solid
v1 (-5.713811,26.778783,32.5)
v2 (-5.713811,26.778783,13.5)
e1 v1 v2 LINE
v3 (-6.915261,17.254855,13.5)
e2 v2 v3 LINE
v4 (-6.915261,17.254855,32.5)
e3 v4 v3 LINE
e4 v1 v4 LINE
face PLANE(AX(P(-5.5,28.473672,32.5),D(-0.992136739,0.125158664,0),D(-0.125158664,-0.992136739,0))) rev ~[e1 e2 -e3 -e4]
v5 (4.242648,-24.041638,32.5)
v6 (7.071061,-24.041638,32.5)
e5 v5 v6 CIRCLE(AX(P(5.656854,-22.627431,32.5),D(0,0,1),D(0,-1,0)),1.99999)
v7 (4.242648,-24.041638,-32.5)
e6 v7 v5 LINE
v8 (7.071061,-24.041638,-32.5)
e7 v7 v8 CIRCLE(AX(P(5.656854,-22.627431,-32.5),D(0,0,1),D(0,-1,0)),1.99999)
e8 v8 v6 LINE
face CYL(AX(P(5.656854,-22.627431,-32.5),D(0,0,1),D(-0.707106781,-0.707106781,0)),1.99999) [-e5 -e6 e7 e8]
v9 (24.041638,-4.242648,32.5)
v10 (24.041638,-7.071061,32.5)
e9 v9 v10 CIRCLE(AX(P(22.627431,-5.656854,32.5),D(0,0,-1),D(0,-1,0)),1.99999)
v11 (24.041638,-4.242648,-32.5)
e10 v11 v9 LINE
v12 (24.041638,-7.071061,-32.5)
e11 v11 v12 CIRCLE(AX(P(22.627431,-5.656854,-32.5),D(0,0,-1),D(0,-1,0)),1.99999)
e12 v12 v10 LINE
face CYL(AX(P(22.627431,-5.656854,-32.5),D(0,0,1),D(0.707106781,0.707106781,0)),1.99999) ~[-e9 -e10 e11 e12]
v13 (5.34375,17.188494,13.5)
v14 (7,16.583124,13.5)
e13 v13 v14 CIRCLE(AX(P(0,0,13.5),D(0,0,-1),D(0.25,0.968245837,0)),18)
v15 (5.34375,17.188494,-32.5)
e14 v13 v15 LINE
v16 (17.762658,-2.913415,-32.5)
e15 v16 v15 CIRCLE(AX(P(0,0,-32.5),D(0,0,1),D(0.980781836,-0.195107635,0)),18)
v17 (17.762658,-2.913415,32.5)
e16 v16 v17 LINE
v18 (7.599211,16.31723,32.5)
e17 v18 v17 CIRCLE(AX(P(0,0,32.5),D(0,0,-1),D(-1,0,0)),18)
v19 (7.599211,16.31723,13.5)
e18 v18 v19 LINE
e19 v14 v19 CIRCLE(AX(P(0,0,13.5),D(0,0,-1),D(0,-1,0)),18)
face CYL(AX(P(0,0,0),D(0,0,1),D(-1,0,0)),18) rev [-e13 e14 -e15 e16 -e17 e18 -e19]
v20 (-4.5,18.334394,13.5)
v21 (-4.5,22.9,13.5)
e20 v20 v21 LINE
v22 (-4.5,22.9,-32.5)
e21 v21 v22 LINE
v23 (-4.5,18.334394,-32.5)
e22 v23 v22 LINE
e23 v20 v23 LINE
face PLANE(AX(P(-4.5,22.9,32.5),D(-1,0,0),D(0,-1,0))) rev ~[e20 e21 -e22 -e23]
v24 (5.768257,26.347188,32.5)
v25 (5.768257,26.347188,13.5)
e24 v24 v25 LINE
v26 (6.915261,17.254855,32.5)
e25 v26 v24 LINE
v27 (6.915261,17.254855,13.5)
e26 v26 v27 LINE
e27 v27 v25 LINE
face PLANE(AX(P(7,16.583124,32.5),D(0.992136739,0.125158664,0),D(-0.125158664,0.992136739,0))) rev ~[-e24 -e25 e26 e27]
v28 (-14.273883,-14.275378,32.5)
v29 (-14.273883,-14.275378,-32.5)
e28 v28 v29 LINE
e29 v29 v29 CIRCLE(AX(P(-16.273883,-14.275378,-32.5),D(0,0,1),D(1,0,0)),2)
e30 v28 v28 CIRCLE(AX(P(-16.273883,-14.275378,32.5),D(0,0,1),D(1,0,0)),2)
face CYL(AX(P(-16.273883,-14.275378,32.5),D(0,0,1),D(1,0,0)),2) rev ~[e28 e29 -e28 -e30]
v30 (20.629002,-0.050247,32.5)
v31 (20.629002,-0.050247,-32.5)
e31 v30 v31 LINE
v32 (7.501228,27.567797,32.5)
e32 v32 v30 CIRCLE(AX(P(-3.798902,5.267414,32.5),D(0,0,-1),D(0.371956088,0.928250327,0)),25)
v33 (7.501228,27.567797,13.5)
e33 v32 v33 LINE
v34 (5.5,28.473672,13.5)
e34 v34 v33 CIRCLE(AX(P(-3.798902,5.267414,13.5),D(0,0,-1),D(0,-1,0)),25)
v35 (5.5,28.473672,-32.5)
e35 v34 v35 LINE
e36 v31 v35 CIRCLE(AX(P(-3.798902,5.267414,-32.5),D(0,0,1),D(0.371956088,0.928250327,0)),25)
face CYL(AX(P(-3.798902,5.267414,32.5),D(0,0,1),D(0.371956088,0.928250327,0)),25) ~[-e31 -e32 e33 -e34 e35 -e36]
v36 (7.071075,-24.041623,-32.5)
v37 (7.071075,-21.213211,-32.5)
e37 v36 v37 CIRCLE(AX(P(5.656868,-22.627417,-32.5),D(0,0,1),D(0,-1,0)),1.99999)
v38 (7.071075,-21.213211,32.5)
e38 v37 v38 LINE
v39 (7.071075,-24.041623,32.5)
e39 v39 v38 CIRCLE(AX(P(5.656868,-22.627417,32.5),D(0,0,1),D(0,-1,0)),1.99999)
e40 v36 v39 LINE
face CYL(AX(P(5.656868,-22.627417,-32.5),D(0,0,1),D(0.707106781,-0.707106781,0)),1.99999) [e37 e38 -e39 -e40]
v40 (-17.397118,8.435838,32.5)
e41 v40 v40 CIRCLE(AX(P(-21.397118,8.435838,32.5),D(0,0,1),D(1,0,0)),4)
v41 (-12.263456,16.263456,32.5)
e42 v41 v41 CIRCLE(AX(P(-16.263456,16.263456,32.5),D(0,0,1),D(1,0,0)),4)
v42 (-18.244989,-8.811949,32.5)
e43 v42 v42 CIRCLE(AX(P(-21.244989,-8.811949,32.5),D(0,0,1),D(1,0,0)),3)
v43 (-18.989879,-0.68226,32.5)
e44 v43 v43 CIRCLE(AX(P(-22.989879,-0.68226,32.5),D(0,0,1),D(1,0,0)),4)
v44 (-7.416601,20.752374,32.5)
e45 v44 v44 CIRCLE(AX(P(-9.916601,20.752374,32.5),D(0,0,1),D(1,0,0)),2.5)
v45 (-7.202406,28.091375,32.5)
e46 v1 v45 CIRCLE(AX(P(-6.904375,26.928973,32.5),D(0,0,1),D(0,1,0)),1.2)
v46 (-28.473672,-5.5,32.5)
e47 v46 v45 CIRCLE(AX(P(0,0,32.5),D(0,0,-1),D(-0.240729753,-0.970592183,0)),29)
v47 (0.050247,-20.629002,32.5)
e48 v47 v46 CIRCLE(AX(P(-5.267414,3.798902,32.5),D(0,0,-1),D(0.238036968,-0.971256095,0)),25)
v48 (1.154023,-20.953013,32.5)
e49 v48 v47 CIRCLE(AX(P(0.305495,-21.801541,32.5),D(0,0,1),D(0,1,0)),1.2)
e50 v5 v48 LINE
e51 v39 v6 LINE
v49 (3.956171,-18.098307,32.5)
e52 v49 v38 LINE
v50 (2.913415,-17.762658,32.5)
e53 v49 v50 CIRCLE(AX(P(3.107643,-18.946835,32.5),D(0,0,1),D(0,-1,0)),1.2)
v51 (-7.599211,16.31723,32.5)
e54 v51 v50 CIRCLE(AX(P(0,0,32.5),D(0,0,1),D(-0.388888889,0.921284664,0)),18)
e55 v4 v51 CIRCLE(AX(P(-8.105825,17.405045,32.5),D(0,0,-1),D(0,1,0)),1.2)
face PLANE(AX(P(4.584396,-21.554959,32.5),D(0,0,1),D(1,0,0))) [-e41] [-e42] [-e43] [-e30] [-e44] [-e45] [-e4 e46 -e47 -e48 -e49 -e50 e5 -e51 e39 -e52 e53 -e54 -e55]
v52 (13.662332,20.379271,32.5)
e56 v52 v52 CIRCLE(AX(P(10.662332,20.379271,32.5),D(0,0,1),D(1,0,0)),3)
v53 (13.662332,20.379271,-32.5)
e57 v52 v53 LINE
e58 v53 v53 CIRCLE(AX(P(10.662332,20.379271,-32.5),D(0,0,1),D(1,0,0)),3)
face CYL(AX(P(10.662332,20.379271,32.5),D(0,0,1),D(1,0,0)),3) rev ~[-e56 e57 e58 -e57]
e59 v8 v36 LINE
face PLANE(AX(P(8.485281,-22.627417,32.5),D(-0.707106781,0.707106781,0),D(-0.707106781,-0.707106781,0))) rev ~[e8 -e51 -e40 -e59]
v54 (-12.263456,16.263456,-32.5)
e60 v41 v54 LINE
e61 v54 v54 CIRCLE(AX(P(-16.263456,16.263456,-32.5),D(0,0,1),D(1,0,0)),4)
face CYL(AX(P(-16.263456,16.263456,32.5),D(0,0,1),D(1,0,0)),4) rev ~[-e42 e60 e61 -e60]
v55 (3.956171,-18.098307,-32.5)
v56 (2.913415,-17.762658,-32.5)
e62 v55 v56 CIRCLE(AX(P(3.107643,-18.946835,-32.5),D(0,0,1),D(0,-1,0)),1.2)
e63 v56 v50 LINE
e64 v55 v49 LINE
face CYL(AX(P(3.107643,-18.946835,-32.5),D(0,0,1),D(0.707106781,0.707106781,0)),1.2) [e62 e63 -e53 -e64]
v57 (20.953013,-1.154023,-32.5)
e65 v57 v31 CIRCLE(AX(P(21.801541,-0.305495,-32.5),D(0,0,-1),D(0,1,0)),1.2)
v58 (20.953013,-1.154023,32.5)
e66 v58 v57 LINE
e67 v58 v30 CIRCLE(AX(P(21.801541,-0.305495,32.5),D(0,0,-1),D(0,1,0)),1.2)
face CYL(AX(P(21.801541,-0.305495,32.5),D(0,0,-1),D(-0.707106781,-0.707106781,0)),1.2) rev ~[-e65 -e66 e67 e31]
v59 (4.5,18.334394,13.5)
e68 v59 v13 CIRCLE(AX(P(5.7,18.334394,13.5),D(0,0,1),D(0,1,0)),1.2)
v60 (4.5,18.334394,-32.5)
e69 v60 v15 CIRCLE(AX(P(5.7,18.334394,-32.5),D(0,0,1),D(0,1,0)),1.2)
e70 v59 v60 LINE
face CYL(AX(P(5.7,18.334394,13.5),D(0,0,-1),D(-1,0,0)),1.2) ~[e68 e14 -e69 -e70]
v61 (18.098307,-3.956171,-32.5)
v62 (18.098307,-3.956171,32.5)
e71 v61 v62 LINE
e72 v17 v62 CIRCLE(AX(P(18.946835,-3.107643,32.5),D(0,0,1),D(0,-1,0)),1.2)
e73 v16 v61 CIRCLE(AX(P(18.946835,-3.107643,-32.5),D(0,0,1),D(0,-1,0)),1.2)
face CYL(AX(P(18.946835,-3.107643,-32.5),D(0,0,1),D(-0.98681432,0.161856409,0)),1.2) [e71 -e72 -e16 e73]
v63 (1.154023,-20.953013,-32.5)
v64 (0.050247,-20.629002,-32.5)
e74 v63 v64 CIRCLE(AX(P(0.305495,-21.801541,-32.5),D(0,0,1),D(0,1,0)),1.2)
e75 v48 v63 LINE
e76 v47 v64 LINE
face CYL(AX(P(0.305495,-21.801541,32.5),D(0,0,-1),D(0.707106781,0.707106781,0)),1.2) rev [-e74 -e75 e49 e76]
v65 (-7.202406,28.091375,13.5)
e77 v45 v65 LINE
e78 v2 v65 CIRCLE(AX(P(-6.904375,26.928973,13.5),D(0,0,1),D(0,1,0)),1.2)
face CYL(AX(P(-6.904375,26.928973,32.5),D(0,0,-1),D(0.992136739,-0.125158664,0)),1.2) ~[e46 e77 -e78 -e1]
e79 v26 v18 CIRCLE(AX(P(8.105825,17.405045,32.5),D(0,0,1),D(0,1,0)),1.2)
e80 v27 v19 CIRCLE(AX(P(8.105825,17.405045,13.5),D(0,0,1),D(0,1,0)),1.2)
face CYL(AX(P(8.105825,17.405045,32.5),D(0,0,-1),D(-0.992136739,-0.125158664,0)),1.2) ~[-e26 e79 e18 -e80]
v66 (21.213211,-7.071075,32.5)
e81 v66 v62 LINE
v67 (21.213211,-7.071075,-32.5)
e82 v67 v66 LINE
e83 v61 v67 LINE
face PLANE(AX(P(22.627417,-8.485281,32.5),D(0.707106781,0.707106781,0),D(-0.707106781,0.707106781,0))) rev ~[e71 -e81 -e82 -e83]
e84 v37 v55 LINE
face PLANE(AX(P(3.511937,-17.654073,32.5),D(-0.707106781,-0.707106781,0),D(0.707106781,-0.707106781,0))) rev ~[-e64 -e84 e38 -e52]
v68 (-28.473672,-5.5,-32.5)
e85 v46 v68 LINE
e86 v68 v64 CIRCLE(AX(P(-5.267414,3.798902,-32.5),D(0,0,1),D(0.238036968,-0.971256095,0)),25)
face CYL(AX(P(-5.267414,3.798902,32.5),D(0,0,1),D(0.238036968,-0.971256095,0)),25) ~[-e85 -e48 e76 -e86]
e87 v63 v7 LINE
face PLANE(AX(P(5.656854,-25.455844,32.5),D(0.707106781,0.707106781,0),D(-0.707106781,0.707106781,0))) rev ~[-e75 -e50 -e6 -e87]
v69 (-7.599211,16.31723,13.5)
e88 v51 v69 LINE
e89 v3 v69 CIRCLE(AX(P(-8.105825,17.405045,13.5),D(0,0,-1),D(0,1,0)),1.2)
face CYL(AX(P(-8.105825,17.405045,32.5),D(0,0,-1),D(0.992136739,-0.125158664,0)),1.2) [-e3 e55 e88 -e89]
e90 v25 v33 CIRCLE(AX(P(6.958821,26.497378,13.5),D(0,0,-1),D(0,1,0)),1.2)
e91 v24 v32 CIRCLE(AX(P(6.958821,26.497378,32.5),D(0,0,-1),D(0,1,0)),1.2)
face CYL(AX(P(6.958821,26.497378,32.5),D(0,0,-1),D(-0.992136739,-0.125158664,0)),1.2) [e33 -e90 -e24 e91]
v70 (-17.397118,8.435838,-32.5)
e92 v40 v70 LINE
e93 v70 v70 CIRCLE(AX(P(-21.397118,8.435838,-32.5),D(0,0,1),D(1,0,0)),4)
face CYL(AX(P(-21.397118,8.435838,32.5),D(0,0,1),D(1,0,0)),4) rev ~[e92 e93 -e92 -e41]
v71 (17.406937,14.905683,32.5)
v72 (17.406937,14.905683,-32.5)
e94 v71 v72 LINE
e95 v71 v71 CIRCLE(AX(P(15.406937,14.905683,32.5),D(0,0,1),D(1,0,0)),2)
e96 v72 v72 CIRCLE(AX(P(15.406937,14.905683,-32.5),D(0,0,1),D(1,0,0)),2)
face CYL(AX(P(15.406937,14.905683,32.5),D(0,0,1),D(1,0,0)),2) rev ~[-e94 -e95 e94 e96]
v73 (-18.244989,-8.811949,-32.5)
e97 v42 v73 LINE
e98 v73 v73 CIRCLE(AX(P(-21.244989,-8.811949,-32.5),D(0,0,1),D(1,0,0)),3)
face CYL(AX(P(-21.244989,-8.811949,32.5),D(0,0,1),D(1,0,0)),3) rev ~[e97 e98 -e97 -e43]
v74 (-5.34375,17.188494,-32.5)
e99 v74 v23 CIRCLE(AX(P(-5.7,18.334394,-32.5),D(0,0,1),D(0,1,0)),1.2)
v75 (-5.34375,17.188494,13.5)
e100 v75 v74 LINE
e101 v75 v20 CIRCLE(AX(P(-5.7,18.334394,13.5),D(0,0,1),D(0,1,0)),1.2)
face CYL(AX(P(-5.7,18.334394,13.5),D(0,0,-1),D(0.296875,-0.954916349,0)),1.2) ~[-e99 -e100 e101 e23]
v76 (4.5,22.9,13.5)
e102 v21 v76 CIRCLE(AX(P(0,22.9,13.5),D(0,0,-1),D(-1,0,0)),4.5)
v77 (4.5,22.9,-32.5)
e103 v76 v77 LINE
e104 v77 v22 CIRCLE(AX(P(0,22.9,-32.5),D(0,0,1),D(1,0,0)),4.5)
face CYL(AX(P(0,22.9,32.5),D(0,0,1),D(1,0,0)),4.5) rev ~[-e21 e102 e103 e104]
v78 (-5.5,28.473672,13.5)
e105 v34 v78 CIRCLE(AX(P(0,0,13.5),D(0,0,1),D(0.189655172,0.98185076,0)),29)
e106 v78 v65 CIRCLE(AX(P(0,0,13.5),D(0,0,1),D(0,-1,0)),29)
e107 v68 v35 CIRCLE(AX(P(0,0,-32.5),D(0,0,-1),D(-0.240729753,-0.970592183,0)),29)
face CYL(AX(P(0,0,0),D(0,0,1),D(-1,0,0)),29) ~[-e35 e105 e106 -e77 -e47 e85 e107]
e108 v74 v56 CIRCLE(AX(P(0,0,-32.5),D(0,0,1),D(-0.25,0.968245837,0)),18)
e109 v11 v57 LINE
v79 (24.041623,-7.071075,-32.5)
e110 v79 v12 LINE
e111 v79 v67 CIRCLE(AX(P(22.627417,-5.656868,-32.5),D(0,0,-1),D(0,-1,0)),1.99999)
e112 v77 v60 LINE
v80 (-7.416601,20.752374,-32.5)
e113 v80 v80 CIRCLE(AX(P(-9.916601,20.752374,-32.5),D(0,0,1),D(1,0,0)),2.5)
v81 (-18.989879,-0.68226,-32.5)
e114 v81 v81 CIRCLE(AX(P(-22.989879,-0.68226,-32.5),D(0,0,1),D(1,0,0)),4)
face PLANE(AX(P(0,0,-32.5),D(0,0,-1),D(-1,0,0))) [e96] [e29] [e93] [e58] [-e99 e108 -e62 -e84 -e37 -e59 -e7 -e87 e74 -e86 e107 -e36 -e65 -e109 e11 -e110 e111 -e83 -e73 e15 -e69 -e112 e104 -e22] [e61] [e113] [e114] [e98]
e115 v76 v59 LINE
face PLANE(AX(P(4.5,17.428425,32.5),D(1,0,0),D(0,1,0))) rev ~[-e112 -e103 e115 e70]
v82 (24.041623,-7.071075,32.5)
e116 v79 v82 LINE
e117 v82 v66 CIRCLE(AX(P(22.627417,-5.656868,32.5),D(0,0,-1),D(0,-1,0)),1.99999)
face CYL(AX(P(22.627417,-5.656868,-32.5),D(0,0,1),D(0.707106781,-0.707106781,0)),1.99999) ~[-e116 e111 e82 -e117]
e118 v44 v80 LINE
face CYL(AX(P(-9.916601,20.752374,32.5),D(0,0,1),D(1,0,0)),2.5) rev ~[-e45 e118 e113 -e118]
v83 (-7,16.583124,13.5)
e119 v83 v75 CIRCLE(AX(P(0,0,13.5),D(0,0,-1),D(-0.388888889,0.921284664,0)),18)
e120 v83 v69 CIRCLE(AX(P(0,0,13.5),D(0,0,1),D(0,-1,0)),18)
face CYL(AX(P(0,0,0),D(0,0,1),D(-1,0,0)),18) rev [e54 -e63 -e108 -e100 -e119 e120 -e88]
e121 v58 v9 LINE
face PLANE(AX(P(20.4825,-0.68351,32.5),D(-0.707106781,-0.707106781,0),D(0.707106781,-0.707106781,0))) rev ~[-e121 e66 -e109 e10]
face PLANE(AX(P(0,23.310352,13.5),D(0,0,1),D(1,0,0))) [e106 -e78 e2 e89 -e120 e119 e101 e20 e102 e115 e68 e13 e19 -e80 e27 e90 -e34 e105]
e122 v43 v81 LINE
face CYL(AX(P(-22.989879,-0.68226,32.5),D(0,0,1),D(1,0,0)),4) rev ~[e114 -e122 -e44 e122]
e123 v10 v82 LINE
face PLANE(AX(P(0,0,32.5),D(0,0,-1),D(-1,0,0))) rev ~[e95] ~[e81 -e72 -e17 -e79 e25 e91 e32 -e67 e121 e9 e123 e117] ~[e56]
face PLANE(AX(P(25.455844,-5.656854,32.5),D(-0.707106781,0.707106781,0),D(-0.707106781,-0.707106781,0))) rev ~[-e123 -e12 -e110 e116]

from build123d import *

# Parameters (mm, degrees)
F0_W     = 11
F0_H     = 65
F3_DEPTH = 19
F4_DEPTH = 65
F5_DEPTH = 65.001
F6_R     = 1.2
F7_R     = 1.99999
F2_R     = 2.5
F2_R_2   = 4
F2_R_3   = 3
F2_R_4   = 2
F8_DEPTH = 65.001


# Not quite as in the source:
# - a fillet or chamfer is up to 0.001 mm smaller than in the source, because OpenCascade refuses the exact size
# - a feature names something its author has since deleted; it is built from what else it names


with BuildPart() as f1:
    # F0 (on Front) → F1 (revolve)
    with BuildSketch(Plane.XZ):
        with Locations((-23.5, 0)):
            Rectangle(F0_W, F0_H)
    revolve(axis=Axis((0, 0, 0.8657751605), (0, 0, -1)))

    # F2 (on face) → F3 (cut)
    with BuildSketch(Plane.XY.offset(32.5)):
        with BuildLine():
            ThreePointArc((-4.5, 22.9), (0, 27.4), (4.5, 22.9))
            Line((4.5, 22.9), (4.5, 17.4284250579))
            ThreePointArc((4.5, 17.4284250579), (5.7655124222, 17.0516528967), (7, 16.5831239518))
            Line((7, 16.5831239518), (5.5, 28.4736720498))
            Line((5.5, 28.4736720498), (-5.5, 28.4736720498))
            Line((-5.5, 28.4736720498), (-7, 16.5831239518))
            ThreePointArc((-7, 16.5831239518), (-5.7655124222, 17.0516528967), (-4.5, 17.4284250579))
            Line((-4.5, 17.4284250579), (-4.5, 22.9))
        make_face()
        with BuildLine():
            Line((-5.5, 28.4736720498), (5.5, 28.4736720498))
            ThreePointArc((5.5, 28.4736720498), (0, 29), (-5.5, 28.4736720498))
        make_face()
        with BuildLine():
            ThreePointArc((17.6540730561, -3.5119374324), (12.7279220614, -12.7279220614), (3.5119374324, -17.6540730561))
            Line((3.5119374324, -17.6540730561), (8.4852813742, -22.627416998))
            Line((8.4852813742, -22.627416998), (5.6568542495, -25.4558441227))
            Line((5.6568542495, -25.4558441227), (2.1959599702, -28.916738402))
            ThreePointArc((2.1959599702, -28.916738402), (20.5060966544, -20.5060966544), (28.916738402, -2.1959599702))
            Line((28.916738402, -2.1959599702), (25.4558441227, -5.6568542495))
            Line((25.4558441227, -5.6568542495), (22.627416998, -8.4852813742))
            Line((22.627416998, -8.4852813742), (17.6540730561, -3.5119374324))
        make_face()
    extrude(amount=-F3_DEPTH, mode=Mode.SUBTRACT)

    # F2 (on face) → F4 (join, through all)
    with BuildSketch(Plane.XY.offset(32.5)):
        Polygon((8.4852813742, -22.627416998), (3.5119374324, -17.6540730561), (0.6835103076, -20.4825001809), (5.6568542495, -25.4558441227), align=None)
        with BuildLine():
            Line((5.6568542495, -25.4558441227), (0.6835103076, -20.4825001809))
            Line((0.6835103076, -20.4825001809), (-6.981162826, -28.1471733145))
            ThreePointArc((-6.981162826, -28.1471733145), (-2.4233446306, -28.8985709128), (2.1959599702, -28.916738402))
            Line((2.1959599702, -28.916738402), (5.6568542495, -25.4558441227))
        make_face()
        with BuildLine():
            ThreePointArc((2.1959599702, -28.916738402), (-2.4233446306, -28.8985709128), (-6.981162826, -28.1471733145))
            Line((-6.981162826, -28.1471733145), (-2.0078188841, -33.1205172564))
            Line((-2.0078188841, -33.1205172564), (2.1959599702, -28.916738402))
        make_face()
        Polygon((25.4558441227, -5.6568542495), (20.4825001809, -0.6835103076), (17.6540730561, -3.5119374324), (22.627416998, -8.4852813742), align=None)
        with BuildLine():
            Line((28.1471733145, 6.981162826), (20.4825001809, -0.6835103076))
            Line((20.4825001809, -0.6835103076), (25.4558441227, -5.6568542495))
            Line((25.4558441227, -5.6568542495), (28.916738402, -2.1959599702))
            ThreePointArc((28.916738402, -2.1959599702), (28.9791771248, -1.0987689344), (29, 0))
            ThreePointArc((29, 0), (28.7860037702, 3.5165305259), (28.1471733145, 6.981162826))
        make_face()
        with BuildLine():
            Line((33.1205172564, 2.0078188841), (28.1471733145, 6.981162826))
            ThreePointArc((28.1471733145, 6.981162826), (28.7860037702, 3.5165305259), (29, 0))
            ThreePointArc((29, 0), (28.9791771248, -1.0987689344), (28.916738402, -2.1959599702))
            Line((28.916738402, -2.1959599702), (33.1205172564, 2.0078188841))
        make_face()
    extrude(amount=-F4_DEPTH)

    # F2 (on face) → F5 (cut, through all)
    with BuildSketch(Plane.XY.offset(32.5)):
        with BuildLine():
            ThreePointArc((-4.5, 22.9), (0, 18.4), (4.5, 22.9))
            ThreePointArc((4.5, 22.9), (0, 27.4), (-4.5, 22.9))
        make_face()
        with BuildLine():
            Line((4.5, 17.4284250579), (4.5, 22.9))
            ThreePointArc((4.5, 22.9), (0, 18.4), (-4.5, 22.9))
            Line((-4.5, 22.9), (-4.5, 17.4284250579))
            ThreePointArc((-4.5, 17.4284250579), (0, 18), (4.5, 17.4284250579))
        make_face()
        with BuildLine():
            ThreePointArc((7, 16.5831239518), (5.7655124222, 17.0516528967), (4.5, 17.4284250579))
            ThreePointArc((4.5, 17.4284250579), (0, 18), (-4.5, 17.4284250579))
            ThreePointArc((-4.5, 17.4284250579), (-5.7655124222, 17.0516528967), (-7, 16.5831239518))
            Line((-7, 16.5831239518), (7, 16.5831239518))
        make_face()
        with BuildLine():
            ThreePointArc((28.1471733145, 6.981162826), (19.9628418868, 21.0353260921), (5.5, 28.4736720498))
            ThreePointArc((5.5, 28.4736720498), (18.4372066045, 16.6935009467), (20.4825001809, -0.6835103076))
            Line((20.4825001809, -0.6835103076), (28.1471733145, 6.981162826))
        make_face()
        with BuildLine():
            ThreePointArc((17.6540730561, -3.5119374324), (12.7279220614, -12.7279220614), (3.5119374324, -17.6540730561))
            Line((3.5119374324, -17.6540730561), (8.4852813742, -22.627416998))
            Line((8.4852813742, -22.627416998), (5.6568542495, -25.4558441227))
            Line((5.6568542495, -25.4558441227), (2.1959599702, -28.916738402))
            ThreePointArc((2.1959599702, -28.916738402), (20.5060966544, -20.5060966544), (28.916738402, -2.1959599702))
            Line((28.916738402, -2.1959599702), (25.4558441227, -5.6568542495))
            Line((25.4558441227, -5.6568542495), (22.627416998, -8.4852813742))
            Line((22.627416998, -8.4852813742), (17.6540730561, -3.5119374324))
        make_face()
        with BuildLine():
            Line((28.1471733145, 6.981162826), (20.4825001809, -0.6835103076))
            Line((20.4825001809, -0.6835103076), (25.4558441227, -5.6568542495))
            Line((25.4558441227, -5.6568542495), (28.916738402, -2.1959599702))
            ThreePointArc((28.916738402, -2.1959599702), (28.9791771248, -1.0987689344), (29, 0))
            ThreePointArc((29, 0), (28.7860037702, 3.5165305259), (28.1471733145, 6.981162826))
        make_face()
        with BuildLine():
            Line((33.1205172564, 2.0078188841), (28.1471733145, 6.981162826))
            ThreePointArc((28.1471733145, 6.981162826), (28.7860037702, 3.5165305259), (29, 0))
            ThreePointArc((29, 0), (28.9791771248, -1.0987689344), (28.916738402, -2.1959599702))
            Line((28.916738402, -2.1959599702), (33.1205172564, 2.0078188841))
        make_face()
        with BuildLine():
            Line((5.6568542495, -25.4558441227), (0.6835103076, -20.4825001809))
            Line((0.6835103076, -20.4825001809), (-6.981162826, -28.1471733145))
            ThreePointArc((-6.981162826, -28.1471733145), (-2.4233446306, -28.8985709128), (2.1959599702, -28.916738402))
            Line((2.1959599702, -28.916738402), (5.6568542495, -25.4558441227))
        make_face()
        with BuildLine():
            Line((-6.981162826, -28.1471733145), (0.6835103076, -20.4825001809))
            ThreePointArc((0.6835103076, -20.4825001809), (-16.6935009467, -18.4372066045), (-28.4736720498, -5.5))
            ThreePointArc((-28.4736720498, -5.5), (-21.0353260921, -19.9628418868), (-6.981162826, -28.1471733145))
        make_face()
        with BuildLine():
            ThreePointArc((2.1959599702, -28.916738402), (-2.4233446306, -28.8985709128), (-6.981162826, -28.1471733145))
            Line((-6.981162826, -28.1471733145), (-2.0078188841, -33.1205172564))
            Line((-2.0078188841, -33.1205172564), (2.1959599702, -28.916738402))
        make_face()
    extrude(amount=-F5_DEPTH, mode=Mode.SUBTRACT)

    # F6
    f6_edges = [f1.edges().sort_by_distance(p)[0] for p in [
        (3.511937, -17.654073, 0),
        (4.5, 17.428425, -9.5),
        (7, 16.583124, 23),
        (-7, 16.583124, 23),
        (-4.5, 17.428425, -9.5),
        (5.5, 28.473672, 23),
        (-5.5, 28.473672, 23),
        (0.68351, -20.4825, 0),
        (20.4825, -0.68351, 0),
        (17.654073, -3.511937, 0),
    ]]
    fillet(f6_edges, radius=F6_R)

    # F7 (radius 2 in the source; OpenCascade refuses exactly that, so slightly less here)
    f7_edges = [f1.edges().sort_by_distance(p)[0] for p in [
        (5.656854, -25.455844, 0),
        (8.485281, -22.627417, 0),
        (22.627417, -8.485281, 0),
        (25.455844, -5.656854, 0),
    ]]
    fillet(f7_edges, radius=F7_R)

    # F2 (on face) → F8 (cut, through all)
    with BuildSketch(Plane.XY.offset(32.5)):
        with Locations((-9.916601295, 20.7523738102)):
            Circle(F2_R)
        with Locations((-16.2634559673, 16.2634559673)):
            Circle(F2_R_2)
        with Locations((-21.397117557, 8.4358378511)):
            Circle(F2_R_2)
        with Locations((10.6623319362, 20.3792707839)):
            Circle(F2_R_3)
        with Locations((-22.9898786685, -0.6822600723)):
            Circle(F2_R_2)
        with Locations((-21.2449889591, -8.8119489404)):
            Circle(F2_R_3)
        with Locations((-16.2738828113, -14.2753784675)):
            Circle(F2_R_4)
        with Locations((15.4069372375, 14.9056833158)):
            Circle(F2_R_4)
    extrude(amount=-F8_DEPTH, mode=Mode.SUBTRACT)


solid = f1.part
